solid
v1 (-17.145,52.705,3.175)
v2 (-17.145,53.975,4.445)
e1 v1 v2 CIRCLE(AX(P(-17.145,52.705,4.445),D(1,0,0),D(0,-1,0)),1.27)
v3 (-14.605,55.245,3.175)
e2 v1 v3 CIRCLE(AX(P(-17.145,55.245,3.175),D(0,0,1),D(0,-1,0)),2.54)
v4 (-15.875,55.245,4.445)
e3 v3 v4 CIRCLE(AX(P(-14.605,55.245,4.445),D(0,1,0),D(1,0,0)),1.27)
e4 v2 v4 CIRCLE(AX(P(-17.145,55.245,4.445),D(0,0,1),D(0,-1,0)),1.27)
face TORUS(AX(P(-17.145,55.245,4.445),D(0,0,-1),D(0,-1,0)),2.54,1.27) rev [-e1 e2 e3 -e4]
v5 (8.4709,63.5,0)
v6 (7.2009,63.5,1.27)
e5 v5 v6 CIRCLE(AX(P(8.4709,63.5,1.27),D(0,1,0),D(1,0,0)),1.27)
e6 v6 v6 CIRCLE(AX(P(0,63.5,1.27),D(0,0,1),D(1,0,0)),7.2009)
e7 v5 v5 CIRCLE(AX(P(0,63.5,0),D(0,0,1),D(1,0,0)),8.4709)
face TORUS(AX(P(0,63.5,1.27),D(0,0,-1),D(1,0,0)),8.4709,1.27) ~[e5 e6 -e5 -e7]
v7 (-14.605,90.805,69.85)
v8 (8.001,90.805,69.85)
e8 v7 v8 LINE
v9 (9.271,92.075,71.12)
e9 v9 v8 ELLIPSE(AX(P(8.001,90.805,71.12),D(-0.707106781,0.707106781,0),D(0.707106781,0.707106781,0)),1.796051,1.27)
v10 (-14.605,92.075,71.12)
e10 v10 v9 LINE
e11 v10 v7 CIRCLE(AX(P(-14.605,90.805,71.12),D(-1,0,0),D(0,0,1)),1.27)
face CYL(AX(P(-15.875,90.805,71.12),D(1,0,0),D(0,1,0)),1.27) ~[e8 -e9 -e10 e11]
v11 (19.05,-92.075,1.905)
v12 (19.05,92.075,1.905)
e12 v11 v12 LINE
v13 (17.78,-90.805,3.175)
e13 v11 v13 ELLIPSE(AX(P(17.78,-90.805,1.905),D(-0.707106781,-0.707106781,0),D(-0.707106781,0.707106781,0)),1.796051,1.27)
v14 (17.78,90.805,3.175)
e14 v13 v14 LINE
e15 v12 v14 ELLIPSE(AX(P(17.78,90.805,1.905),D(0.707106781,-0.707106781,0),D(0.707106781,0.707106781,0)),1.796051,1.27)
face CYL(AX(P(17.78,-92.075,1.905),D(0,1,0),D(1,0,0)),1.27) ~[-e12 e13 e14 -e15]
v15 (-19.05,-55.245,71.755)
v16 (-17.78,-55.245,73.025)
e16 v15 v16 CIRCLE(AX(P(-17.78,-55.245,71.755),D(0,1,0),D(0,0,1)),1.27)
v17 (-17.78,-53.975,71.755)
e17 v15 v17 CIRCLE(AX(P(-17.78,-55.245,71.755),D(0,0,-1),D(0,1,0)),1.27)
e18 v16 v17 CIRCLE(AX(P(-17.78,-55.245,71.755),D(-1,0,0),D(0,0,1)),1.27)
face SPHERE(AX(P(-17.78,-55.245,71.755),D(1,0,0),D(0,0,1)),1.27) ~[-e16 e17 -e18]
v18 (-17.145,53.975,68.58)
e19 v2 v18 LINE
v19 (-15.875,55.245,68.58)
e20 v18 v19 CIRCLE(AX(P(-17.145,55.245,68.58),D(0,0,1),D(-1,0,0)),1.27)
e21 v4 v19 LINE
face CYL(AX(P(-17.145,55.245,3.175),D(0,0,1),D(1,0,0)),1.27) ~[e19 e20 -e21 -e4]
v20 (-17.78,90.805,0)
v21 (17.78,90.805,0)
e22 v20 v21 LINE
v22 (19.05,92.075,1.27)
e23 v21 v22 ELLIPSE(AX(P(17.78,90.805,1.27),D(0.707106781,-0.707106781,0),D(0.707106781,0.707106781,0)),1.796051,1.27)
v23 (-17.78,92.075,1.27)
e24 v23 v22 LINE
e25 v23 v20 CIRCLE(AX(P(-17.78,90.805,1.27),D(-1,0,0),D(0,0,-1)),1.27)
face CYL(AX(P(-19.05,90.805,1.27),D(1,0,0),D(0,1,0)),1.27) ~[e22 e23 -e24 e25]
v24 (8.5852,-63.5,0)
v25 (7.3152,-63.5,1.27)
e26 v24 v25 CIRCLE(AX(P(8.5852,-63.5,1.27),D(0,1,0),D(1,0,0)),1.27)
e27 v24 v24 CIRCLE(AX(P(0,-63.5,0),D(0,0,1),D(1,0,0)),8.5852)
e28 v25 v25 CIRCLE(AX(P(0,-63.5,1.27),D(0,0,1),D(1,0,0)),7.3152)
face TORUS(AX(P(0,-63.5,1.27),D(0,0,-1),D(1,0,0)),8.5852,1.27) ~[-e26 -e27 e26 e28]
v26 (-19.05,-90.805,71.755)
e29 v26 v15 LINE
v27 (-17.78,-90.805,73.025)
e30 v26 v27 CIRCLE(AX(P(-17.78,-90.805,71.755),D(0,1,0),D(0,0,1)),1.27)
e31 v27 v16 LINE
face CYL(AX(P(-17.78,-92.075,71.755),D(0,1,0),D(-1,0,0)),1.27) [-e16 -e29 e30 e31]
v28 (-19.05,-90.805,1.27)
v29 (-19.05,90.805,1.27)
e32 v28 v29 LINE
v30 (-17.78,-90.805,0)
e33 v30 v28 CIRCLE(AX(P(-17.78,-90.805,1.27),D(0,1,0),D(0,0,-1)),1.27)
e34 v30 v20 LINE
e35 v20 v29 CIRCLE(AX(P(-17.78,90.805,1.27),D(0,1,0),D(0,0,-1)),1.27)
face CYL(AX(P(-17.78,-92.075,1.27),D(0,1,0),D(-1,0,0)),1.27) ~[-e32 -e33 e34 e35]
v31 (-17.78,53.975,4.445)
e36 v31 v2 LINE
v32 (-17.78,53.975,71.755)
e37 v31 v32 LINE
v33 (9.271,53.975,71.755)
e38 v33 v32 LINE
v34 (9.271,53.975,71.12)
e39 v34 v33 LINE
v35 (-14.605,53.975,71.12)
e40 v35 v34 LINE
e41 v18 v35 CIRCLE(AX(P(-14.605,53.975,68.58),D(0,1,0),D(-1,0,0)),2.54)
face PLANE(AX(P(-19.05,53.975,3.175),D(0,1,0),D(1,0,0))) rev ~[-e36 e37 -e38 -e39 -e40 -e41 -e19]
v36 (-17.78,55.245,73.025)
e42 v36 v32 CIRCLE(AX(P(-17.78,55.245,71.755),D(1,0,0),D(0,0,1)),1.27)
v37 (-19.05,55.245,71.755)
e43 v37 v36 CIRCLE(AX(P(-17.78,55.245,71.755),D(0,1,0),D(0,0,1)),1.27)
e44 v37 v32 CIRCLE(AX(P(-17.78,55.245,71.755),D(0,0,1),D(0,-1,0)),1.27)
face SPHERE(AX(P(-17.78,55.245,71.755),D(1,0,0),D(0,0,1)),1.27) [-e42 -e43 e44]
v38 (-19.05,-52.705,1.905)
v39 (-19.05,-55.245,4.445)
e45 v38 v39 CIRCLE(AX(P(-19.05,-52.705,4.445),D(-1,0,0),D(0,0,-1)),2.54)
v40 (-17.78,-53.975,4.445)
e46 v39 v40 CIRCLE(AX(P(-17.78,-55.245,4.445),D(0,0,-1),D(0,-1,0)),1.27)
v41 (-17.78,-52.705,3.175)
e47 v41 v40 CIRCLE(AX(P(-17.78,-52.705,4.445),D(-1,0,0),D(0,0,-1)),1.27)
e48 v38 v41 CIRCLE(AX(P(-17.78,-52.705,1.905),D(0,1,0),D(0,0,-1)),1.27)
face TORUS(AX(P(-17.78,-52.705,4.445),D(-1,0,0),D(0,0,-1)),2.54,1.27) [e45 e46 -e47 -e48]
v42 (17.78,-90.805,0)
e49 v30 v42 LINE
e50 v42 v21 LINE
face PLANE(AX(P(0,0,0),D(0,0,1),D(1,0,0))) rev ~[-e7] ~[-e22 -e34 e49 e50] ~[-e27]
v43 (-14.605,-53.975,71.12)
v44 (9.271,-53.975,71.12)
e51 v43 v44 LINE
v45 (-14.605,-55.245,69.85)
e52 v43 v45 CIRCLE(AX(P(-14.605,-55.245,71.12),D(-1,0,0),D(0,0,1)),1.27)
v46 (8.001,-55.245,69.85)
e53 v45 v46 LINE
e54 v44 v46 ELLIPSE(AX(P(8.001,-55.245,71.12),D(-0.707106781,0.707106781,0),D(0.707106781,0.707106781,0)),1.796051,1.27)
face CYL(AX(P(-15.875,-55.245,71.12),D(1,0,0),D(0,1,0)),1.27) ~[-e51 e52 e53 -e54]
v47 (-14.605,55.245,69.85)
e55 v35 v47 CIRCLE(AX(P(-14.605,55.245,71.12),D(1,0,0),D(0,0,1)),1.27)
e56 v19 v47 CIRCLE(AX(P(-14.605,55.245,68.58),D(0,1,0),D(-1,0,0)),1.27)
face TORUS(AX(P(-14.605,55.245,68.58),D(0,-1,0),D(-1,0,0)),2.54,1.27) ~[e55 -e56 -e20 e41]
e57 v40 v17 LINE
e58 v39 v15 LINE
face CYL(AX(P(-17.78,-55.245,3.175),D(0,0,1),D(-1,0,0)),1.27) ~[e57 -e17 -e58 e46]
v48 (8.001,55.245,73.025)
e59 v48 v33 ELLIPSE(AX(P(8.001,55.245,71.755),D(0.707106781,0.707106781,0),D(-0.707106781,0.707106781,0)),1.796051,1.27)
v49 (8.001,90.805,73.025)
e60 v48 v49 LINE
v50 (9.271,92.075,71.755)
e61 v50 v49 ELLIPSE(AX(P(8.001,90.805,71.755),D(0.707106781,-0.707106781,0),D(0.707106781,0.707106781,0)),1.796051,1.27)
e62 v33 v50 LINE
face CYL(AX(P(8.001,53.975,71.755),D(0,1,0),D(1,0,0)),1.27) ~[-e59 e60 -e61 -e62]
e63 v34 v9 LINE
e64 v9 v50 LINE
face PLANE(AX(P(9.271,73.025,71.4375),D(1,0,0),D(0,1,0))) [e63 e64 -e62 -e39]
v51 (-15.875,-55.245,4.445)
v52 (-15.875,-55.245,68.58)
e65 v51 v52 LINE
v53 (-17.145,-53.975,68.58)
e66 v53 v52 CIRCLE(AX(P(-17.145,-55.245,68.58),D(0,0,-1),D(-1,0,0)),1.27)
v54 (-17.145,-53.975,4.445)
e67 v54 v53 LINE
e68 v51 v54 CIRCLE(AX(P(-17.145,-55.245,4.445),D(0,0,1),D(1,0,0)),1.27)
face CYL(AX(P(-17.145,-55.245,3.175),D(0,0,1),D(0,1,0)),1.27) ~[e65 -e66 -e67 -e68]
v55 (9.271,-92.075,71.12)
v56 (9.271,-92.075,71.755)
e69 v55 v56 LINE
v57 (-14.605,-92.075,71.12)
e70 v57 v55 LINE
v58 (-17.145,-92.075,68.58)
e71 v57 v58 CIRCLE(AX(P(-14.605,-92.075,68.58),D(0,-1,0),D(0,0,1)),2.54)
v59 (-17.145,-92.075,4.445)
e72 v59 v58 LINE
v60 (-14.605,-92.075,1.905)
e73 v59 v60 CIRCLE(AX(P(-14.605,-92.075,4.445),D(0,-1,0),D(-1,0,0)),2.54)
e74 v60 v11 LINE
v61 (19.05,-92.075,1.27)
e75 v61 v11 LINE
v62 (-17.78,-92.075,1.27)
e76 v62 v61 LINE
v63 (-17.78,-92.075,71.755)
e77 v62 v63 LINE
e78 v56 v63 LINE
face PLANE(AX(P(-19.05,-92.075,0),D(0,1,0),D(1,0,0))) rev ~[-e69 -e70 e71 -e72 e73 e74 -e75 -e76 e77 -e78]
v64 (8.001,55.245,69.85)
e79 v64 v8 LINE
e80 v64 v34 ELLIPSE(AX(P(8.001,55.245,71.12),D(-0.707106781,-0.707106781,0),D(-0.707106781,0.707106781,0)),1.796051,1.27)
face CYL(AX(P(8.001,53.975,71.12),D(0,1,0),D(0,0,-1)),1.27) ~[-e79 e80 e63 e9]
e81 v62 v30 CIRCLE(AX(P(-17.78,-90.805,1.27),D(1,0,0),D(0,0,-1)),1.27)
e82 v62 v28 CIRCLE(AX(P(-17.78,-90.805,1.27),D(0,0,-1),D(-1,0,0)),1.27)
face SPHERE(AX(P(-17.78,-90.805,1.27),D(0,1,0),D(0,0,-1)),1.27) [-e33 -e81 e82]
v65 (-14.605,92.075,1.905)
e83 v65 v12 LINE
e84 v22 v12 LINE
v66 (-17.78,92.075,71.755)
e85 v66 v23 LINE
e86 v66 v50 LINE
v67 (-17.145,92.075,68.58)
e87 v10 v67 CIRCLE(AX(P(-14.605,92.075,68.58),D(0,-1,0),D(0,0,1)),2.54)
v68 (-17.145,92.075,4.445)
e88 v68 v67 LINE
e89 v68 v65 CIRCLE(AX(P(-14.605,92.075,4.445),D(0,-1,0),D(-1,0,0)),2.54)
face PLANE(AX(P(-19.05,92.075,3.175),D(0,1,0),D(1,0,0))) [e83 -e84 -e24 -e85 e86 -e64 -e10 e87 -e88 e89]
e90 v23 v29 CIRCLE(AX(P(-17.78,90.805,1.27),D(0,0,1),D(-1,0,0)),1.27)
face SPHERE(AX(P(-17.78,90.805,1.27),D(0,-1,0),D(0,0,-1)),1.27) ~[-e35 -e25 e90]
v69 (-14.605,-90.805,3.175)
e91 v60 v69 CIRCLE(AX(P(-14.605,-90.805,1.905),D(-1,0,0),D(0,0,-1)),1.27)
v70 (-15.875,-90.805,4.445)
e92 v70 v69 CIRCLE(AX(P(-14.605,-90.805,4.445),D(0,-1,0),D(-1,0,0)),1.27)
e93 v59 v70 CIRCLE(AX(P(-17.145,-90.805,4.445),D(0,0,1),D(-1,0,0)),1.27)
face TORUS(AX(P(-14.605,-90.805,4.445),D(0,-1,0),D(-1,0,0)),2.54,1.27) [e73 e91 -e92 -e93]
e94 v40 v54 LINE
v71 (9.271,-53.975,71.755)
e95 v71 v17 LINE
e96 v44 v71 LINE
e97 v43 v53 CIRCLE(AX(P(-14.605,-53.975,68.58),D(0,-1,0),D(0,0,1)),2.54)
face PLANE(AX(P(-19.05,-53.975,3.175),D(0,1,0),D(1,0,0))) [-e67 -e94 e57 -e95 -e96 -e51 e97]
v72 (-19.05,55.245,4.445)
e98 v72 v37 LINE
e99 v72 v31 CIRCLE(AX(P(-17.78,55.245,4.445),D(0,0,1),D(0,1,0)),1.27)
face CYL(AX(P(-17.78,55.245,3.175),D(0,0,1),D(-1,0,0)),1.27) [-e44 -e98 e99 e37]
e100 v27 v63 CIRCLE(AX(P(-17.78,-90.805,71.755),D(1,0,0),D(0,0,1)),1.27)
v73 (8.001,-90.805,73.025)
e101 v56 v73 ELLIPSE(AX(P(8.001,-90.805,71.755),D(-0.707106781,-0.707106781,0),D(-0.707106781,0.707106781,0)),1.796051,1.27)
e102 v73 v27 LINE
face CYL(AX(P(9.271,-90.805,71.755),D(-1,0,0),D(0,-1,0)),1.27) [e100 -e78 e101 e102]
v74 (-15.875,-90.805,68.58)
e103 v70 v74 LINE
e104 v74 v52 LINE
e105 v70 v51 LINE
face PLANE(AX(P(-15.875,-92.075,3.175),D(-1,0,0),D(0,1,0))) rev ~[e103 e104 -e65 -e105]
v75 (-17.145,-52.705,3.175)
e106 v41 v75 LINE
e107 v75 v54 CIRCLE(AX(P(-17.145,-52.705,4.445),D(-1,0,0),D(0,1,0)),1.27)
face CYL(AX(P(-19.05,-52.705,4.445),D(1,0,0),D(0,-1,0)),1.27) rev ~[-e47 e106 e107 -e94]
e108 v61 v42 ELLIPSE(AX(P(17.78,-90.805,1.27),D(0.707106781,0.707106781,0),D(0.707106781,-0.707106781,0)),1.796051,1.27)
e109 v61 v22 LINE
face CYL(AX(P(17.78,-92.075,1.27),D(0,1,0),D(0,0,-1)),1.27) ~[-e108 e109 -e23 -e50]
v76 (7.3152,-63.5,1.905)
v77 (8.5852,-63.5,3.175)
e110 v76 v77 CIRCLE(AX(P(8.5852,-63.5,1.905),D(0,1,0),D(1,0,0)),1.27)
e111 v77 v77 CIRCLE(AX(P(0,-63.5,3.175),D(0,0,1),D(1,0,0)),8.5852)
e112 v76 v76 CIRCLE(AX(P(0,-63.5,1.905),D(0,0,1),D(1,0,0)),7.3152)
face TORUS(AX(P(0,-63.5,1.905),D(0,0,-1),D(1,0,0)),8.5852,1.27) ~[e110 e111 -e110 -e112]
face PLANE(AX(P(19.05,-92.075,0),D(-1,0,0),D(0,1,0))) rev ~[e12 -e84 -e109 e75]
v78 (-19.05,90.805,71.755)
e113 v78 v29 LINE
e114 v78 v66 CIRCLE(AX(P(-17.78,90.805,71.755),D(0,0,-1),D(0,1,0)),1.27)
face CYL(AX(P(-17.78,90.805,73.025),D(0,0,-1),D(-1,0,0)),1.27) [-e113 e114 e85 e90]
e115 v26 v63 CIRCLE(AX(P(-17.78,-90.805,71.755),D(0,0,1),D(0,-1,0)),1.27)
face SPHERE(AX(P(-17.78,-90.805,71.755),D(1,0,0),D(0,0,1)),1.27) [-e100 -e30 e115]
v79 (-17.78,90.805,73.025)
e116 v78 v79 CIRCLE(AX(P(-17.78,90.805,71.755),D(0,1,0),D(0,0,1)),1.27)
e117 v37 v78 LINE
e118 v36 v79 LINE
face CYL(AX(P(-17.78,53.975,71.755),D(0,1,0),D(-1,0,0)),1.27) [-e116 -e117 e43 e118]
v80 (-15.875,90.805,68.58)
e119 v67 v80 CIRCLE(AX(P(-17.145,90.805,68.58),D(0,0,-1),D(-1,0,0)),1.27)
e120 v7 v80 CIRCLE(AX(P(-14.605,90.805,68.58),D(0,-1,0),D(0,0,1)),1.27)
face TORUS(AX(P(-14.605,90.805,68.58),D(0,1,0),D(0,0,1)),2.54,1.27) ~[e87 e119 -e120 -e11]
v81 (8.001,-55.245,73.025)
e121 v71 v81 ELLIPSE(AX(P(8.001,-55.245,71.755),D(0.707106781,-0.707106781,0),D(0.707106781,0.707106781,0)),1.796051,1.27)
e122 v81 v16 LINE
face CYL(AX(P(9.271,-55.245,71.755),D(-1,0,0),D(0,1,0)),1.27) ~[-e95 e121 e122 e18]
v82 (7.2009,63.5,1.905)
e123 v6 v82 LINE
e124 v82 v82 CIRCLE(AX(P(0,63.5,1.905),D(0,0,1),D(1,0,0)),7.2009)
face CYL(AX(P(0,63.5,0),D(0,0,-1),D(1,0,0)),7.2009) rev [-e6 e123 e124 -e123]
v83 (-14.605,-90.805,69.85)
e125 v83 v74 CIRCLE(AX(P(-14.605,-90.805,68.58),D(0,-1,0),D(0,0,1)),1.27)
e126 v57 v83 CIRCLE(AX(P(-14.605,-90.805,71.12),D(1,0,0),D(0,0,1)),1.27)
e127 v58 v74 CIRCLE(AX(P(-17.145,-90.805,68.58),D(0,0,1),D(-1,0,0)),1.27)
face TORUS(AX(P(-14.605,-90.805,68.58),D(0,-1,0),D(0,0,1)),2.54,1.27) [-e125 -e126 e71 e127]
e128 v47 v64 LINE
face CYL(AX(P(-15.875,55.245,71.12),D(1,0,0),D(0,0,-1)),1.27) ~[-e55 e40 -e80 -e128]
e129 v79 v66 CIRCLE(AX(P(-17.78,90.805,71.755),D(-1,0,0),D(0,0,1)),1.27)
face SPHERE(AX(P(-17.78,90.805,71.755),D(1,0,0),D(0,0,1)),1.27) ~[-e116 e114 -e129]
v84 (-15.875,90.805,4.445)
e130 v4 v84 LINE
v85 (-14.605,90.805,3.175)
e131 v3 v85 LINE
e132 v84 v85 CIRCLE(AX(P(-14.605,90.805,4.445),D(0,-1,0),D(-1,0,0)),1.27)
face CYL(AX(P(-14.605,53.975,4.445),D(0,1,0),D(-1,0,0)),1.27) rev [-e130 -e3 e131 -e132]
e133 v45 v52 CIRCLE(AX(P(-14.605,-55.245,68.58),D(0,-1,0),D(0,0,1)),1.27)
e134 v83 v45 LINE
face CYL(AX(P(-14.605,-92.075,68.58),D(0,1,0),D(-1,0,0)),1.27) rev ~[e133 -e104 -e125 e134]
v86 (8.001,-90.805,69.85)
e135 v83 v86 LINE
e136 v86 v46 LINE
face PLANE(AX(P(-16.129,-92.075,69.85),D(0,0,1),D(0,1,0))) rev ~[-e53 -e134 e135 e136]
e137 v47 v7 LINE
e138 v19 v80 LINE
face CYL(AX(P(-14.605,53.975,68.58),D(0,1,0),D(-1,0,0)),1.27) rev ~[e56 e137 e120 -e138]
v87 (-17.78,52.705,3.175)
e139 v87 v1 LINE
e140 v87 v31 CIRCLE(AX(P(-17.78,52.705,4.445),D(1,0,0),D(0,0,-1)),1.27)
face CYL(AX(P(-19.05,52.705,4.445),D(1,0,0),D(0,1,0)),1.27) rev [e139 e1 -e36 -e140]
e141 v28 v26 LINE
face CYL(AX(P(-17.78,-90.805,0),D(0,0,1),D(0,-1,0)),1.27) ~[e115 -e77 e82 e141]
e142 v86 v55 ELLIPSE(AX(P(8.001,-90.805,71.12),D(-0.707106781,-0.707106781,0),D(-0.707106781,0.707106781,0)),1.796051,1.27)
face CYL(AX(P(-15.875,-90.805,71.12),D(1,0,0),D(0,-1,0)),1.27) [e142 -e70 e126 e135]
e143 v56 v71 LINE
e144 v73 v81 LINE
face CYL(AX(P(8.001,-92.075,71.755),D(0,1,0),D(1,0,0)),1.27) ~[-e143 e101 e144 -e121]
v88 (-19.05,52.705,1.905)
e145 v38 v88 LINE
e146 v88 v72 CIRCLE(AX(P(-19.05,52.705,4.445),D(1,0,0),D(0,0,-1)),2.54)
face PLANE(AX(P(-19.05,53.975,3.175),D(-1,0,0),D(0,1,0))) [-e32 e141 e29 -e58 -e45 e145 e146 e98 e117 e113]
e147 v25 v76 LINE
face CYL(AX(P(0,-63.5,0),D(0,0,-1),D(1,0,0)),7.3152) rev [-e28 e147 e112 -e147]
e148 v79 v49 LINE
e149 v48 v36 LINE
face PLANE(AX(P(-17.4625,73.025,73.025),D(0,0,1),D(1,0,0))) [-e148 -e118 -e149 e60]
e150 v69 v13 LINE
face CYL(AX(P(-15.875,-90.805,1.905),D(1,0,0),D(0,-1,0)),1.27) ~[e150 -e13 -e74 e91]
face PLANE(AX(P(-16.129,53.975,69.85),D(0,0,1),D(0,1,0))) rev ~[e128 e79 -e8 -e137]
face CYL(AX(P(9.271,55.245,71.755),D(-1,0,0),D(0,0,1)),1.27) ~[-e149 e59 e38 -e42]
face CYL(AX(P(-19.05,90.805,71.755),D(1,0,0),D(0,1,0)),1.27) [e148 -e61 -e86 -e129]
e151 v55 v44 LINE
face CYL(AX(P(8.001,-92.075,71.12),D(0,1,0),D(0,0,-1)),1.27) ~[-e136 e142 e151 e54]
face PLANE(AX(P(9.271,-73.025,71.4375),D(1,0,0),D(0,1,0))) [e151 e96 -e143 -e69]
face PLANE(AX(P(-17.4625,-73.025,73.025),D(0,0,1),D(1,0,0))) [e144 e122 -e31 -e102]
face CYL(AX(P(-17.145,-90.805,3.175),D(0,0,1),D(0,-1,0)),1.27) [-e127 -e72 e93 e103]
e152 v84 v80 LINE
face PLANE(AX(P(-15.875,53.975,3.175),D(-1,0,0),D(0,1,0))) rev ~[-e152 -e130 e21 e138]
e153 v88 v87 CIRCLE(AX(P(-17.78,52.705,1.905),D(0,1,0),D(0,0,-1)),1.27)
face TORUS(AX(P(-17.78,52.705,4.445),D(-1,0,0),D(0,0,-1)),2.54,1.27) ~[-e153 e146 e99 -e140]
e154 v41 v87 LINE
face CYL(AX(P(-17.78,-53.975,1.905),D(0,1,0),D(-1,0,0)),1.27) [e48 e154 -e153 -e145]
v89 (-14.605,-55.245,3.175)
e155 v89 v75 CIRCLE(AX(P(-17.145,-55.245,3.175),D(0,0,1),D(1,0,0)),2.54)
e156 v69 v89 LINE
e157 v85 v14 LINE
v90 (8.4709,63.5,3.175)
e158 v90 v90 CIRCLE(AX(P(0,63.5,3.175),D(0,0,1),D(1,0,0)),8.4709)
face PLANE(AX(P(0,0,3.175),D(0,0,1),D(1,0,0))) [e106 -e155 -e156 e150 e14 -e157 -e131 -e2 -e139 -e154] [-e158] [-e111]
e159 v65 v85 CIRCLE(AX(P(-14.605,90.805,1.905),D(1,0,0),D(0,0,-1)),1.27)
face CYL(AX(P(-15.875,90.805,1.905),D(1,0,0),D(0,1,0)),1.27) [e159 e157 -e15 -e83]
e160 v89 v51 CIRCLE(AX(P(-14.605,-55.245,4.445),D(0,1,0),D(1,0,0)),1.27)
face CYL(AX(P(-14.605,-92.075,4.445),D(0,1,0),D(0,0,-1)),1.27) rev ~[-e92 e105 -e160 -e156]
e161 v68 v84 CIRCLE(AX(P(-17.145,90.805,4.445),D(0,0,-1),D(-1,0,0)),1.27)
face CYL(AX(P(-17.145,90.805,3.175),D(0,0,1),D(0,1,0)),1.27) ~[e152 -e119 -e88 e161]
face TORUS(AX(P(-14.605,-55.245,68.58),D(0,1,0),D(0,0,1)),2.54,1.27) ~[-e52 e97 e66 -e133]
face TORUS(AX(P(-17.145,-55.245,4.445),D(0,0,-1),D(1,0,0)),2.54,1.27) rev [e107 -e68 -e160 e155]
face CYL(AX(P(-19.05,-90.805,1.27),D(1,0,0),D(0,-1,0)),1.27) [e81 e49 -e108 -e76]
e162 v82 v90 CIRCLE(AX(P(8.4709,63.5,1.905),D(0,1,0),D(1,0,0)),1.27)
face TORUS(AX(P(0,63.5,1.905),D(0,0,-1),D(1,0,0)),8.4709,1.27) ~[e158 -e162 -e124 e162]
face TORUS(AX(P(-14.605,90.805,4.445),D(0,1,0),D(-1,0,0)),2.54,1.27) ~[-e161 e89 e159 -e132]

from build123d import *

# Parameters (mm, degrees)
F0_W     = 38.1
F0_H     = 184.15
F0_R     = 7.3152
F0_R_2   = 7.2009
F1_DEPTH = 3.175
F3_W     = 3.175
F3_H     = 38.1
F4_DEPTH = 69.85
F6_W     = 38.1
F6_H     = 3.175
F7_DEPTH = 25.4
F8_R     = 1.27


with BuildPart() as f1:
    # F0 (on Top) → F1 (new body)
    with BuildSketch(Plane.XY):
        Rectangle(F0_W, F0_H)
        with Locations((0, -63.5)):
            Circle(F0_R, mode=Mode.SUBTRACT)
        with Locations((0, 63.5)):
            Circle(F0_R_2, mode=Mode.SUBTRACT)
    extrude(amount=F1_DEPTH)

    # F3 (on offset) → F4 (join)
    with BuildSketch(Plane.XY.offset(3.175)):
        with Locations((-17.4625, 73.025)):
            Rectangle(F3_W, F3_H)
        with Locations((-17.4625, -73.025)):
            Rectangle(F3_W, F3_H)
    extrude(amount=F4_DEPTH)

    # F6 (on offset) → F7 (join)
    with BuildSketch(Plane.YZ.offset(-16.129)):
        with Locations((-73.025, 71.4375)):
            Rectangle(F6_W, F6_H)
        with Locations((73.025, 71.4375)):
            Rectangle(F6_W, F6_H)
    extrude(amount=F7_DEPTH)

    # F8
    f8_edges = [f1.edges().sort_by_distance(p)[0] for p in [
        (-15.875, 73.025, 3.175),
        (-15.875, 92.075, 36.5125),
        (-15.875, 73.025, 69.85),
        (-15.875, 53.975, 36.5125),
        (-19.05, 0, 0),
        (0, -92.075, 0),
        (19.05, 0, 0),
        (0, 92.075, 0),
        (-7.3152, -63.5, 0),
        (-7.2009, 63.5, 0),
        (-3.302, 92.075, 69.85),
        (9.271, 73.025, 69.85),
        (-3.302, 53.975, 69.85),
        (-15.875, -73.025, 69.85),
        (-3.302, -53.975, 69.85),
        (9.271, -73.025, 69.85),
        (-3.302, -92.075, 69.85),
        (-4.8895, -92.075, 73.025),
        (9.271, -73.025, 73.025),
        (-4.8895, -53.975, 73.025),
        (-19.05, -73.025, 73.025),
        (-4.8895, 53.975, 73.025),
        (9.271, 73.025, 73.025),
        (-4.8895, 92.075, 73.025),
        (-19.05, 73.025, 73.025),
        (-17.4625, 53.975, 3.175),
        (1.5875, 92.075, 3.175),
        (19.05, 0, 3.175),
        (1.5875, -92.075, 3.175),
        (-15.875, -73.025, 3.175),
        (-17.4625, -53.975, 3.175),
        (-19.05, 0, 3.175),
        (-7.3152, -63.5, 3.175),
        (-7.2009, 63.5, 3.175),
        (-19.05, -92.075, 36.5125),
        (-19.05, -53.975, 38.1),
        (-19.05, 92.075, 36.5125),
        (-19.05, 53.975, 38.1),
        (-15.875, -92.075, 36.5125),
        (-15.875, -53.975, 36.5125),
    ]]
    fillet(f8_edges, radius=F8_R)


solid = f1.part
